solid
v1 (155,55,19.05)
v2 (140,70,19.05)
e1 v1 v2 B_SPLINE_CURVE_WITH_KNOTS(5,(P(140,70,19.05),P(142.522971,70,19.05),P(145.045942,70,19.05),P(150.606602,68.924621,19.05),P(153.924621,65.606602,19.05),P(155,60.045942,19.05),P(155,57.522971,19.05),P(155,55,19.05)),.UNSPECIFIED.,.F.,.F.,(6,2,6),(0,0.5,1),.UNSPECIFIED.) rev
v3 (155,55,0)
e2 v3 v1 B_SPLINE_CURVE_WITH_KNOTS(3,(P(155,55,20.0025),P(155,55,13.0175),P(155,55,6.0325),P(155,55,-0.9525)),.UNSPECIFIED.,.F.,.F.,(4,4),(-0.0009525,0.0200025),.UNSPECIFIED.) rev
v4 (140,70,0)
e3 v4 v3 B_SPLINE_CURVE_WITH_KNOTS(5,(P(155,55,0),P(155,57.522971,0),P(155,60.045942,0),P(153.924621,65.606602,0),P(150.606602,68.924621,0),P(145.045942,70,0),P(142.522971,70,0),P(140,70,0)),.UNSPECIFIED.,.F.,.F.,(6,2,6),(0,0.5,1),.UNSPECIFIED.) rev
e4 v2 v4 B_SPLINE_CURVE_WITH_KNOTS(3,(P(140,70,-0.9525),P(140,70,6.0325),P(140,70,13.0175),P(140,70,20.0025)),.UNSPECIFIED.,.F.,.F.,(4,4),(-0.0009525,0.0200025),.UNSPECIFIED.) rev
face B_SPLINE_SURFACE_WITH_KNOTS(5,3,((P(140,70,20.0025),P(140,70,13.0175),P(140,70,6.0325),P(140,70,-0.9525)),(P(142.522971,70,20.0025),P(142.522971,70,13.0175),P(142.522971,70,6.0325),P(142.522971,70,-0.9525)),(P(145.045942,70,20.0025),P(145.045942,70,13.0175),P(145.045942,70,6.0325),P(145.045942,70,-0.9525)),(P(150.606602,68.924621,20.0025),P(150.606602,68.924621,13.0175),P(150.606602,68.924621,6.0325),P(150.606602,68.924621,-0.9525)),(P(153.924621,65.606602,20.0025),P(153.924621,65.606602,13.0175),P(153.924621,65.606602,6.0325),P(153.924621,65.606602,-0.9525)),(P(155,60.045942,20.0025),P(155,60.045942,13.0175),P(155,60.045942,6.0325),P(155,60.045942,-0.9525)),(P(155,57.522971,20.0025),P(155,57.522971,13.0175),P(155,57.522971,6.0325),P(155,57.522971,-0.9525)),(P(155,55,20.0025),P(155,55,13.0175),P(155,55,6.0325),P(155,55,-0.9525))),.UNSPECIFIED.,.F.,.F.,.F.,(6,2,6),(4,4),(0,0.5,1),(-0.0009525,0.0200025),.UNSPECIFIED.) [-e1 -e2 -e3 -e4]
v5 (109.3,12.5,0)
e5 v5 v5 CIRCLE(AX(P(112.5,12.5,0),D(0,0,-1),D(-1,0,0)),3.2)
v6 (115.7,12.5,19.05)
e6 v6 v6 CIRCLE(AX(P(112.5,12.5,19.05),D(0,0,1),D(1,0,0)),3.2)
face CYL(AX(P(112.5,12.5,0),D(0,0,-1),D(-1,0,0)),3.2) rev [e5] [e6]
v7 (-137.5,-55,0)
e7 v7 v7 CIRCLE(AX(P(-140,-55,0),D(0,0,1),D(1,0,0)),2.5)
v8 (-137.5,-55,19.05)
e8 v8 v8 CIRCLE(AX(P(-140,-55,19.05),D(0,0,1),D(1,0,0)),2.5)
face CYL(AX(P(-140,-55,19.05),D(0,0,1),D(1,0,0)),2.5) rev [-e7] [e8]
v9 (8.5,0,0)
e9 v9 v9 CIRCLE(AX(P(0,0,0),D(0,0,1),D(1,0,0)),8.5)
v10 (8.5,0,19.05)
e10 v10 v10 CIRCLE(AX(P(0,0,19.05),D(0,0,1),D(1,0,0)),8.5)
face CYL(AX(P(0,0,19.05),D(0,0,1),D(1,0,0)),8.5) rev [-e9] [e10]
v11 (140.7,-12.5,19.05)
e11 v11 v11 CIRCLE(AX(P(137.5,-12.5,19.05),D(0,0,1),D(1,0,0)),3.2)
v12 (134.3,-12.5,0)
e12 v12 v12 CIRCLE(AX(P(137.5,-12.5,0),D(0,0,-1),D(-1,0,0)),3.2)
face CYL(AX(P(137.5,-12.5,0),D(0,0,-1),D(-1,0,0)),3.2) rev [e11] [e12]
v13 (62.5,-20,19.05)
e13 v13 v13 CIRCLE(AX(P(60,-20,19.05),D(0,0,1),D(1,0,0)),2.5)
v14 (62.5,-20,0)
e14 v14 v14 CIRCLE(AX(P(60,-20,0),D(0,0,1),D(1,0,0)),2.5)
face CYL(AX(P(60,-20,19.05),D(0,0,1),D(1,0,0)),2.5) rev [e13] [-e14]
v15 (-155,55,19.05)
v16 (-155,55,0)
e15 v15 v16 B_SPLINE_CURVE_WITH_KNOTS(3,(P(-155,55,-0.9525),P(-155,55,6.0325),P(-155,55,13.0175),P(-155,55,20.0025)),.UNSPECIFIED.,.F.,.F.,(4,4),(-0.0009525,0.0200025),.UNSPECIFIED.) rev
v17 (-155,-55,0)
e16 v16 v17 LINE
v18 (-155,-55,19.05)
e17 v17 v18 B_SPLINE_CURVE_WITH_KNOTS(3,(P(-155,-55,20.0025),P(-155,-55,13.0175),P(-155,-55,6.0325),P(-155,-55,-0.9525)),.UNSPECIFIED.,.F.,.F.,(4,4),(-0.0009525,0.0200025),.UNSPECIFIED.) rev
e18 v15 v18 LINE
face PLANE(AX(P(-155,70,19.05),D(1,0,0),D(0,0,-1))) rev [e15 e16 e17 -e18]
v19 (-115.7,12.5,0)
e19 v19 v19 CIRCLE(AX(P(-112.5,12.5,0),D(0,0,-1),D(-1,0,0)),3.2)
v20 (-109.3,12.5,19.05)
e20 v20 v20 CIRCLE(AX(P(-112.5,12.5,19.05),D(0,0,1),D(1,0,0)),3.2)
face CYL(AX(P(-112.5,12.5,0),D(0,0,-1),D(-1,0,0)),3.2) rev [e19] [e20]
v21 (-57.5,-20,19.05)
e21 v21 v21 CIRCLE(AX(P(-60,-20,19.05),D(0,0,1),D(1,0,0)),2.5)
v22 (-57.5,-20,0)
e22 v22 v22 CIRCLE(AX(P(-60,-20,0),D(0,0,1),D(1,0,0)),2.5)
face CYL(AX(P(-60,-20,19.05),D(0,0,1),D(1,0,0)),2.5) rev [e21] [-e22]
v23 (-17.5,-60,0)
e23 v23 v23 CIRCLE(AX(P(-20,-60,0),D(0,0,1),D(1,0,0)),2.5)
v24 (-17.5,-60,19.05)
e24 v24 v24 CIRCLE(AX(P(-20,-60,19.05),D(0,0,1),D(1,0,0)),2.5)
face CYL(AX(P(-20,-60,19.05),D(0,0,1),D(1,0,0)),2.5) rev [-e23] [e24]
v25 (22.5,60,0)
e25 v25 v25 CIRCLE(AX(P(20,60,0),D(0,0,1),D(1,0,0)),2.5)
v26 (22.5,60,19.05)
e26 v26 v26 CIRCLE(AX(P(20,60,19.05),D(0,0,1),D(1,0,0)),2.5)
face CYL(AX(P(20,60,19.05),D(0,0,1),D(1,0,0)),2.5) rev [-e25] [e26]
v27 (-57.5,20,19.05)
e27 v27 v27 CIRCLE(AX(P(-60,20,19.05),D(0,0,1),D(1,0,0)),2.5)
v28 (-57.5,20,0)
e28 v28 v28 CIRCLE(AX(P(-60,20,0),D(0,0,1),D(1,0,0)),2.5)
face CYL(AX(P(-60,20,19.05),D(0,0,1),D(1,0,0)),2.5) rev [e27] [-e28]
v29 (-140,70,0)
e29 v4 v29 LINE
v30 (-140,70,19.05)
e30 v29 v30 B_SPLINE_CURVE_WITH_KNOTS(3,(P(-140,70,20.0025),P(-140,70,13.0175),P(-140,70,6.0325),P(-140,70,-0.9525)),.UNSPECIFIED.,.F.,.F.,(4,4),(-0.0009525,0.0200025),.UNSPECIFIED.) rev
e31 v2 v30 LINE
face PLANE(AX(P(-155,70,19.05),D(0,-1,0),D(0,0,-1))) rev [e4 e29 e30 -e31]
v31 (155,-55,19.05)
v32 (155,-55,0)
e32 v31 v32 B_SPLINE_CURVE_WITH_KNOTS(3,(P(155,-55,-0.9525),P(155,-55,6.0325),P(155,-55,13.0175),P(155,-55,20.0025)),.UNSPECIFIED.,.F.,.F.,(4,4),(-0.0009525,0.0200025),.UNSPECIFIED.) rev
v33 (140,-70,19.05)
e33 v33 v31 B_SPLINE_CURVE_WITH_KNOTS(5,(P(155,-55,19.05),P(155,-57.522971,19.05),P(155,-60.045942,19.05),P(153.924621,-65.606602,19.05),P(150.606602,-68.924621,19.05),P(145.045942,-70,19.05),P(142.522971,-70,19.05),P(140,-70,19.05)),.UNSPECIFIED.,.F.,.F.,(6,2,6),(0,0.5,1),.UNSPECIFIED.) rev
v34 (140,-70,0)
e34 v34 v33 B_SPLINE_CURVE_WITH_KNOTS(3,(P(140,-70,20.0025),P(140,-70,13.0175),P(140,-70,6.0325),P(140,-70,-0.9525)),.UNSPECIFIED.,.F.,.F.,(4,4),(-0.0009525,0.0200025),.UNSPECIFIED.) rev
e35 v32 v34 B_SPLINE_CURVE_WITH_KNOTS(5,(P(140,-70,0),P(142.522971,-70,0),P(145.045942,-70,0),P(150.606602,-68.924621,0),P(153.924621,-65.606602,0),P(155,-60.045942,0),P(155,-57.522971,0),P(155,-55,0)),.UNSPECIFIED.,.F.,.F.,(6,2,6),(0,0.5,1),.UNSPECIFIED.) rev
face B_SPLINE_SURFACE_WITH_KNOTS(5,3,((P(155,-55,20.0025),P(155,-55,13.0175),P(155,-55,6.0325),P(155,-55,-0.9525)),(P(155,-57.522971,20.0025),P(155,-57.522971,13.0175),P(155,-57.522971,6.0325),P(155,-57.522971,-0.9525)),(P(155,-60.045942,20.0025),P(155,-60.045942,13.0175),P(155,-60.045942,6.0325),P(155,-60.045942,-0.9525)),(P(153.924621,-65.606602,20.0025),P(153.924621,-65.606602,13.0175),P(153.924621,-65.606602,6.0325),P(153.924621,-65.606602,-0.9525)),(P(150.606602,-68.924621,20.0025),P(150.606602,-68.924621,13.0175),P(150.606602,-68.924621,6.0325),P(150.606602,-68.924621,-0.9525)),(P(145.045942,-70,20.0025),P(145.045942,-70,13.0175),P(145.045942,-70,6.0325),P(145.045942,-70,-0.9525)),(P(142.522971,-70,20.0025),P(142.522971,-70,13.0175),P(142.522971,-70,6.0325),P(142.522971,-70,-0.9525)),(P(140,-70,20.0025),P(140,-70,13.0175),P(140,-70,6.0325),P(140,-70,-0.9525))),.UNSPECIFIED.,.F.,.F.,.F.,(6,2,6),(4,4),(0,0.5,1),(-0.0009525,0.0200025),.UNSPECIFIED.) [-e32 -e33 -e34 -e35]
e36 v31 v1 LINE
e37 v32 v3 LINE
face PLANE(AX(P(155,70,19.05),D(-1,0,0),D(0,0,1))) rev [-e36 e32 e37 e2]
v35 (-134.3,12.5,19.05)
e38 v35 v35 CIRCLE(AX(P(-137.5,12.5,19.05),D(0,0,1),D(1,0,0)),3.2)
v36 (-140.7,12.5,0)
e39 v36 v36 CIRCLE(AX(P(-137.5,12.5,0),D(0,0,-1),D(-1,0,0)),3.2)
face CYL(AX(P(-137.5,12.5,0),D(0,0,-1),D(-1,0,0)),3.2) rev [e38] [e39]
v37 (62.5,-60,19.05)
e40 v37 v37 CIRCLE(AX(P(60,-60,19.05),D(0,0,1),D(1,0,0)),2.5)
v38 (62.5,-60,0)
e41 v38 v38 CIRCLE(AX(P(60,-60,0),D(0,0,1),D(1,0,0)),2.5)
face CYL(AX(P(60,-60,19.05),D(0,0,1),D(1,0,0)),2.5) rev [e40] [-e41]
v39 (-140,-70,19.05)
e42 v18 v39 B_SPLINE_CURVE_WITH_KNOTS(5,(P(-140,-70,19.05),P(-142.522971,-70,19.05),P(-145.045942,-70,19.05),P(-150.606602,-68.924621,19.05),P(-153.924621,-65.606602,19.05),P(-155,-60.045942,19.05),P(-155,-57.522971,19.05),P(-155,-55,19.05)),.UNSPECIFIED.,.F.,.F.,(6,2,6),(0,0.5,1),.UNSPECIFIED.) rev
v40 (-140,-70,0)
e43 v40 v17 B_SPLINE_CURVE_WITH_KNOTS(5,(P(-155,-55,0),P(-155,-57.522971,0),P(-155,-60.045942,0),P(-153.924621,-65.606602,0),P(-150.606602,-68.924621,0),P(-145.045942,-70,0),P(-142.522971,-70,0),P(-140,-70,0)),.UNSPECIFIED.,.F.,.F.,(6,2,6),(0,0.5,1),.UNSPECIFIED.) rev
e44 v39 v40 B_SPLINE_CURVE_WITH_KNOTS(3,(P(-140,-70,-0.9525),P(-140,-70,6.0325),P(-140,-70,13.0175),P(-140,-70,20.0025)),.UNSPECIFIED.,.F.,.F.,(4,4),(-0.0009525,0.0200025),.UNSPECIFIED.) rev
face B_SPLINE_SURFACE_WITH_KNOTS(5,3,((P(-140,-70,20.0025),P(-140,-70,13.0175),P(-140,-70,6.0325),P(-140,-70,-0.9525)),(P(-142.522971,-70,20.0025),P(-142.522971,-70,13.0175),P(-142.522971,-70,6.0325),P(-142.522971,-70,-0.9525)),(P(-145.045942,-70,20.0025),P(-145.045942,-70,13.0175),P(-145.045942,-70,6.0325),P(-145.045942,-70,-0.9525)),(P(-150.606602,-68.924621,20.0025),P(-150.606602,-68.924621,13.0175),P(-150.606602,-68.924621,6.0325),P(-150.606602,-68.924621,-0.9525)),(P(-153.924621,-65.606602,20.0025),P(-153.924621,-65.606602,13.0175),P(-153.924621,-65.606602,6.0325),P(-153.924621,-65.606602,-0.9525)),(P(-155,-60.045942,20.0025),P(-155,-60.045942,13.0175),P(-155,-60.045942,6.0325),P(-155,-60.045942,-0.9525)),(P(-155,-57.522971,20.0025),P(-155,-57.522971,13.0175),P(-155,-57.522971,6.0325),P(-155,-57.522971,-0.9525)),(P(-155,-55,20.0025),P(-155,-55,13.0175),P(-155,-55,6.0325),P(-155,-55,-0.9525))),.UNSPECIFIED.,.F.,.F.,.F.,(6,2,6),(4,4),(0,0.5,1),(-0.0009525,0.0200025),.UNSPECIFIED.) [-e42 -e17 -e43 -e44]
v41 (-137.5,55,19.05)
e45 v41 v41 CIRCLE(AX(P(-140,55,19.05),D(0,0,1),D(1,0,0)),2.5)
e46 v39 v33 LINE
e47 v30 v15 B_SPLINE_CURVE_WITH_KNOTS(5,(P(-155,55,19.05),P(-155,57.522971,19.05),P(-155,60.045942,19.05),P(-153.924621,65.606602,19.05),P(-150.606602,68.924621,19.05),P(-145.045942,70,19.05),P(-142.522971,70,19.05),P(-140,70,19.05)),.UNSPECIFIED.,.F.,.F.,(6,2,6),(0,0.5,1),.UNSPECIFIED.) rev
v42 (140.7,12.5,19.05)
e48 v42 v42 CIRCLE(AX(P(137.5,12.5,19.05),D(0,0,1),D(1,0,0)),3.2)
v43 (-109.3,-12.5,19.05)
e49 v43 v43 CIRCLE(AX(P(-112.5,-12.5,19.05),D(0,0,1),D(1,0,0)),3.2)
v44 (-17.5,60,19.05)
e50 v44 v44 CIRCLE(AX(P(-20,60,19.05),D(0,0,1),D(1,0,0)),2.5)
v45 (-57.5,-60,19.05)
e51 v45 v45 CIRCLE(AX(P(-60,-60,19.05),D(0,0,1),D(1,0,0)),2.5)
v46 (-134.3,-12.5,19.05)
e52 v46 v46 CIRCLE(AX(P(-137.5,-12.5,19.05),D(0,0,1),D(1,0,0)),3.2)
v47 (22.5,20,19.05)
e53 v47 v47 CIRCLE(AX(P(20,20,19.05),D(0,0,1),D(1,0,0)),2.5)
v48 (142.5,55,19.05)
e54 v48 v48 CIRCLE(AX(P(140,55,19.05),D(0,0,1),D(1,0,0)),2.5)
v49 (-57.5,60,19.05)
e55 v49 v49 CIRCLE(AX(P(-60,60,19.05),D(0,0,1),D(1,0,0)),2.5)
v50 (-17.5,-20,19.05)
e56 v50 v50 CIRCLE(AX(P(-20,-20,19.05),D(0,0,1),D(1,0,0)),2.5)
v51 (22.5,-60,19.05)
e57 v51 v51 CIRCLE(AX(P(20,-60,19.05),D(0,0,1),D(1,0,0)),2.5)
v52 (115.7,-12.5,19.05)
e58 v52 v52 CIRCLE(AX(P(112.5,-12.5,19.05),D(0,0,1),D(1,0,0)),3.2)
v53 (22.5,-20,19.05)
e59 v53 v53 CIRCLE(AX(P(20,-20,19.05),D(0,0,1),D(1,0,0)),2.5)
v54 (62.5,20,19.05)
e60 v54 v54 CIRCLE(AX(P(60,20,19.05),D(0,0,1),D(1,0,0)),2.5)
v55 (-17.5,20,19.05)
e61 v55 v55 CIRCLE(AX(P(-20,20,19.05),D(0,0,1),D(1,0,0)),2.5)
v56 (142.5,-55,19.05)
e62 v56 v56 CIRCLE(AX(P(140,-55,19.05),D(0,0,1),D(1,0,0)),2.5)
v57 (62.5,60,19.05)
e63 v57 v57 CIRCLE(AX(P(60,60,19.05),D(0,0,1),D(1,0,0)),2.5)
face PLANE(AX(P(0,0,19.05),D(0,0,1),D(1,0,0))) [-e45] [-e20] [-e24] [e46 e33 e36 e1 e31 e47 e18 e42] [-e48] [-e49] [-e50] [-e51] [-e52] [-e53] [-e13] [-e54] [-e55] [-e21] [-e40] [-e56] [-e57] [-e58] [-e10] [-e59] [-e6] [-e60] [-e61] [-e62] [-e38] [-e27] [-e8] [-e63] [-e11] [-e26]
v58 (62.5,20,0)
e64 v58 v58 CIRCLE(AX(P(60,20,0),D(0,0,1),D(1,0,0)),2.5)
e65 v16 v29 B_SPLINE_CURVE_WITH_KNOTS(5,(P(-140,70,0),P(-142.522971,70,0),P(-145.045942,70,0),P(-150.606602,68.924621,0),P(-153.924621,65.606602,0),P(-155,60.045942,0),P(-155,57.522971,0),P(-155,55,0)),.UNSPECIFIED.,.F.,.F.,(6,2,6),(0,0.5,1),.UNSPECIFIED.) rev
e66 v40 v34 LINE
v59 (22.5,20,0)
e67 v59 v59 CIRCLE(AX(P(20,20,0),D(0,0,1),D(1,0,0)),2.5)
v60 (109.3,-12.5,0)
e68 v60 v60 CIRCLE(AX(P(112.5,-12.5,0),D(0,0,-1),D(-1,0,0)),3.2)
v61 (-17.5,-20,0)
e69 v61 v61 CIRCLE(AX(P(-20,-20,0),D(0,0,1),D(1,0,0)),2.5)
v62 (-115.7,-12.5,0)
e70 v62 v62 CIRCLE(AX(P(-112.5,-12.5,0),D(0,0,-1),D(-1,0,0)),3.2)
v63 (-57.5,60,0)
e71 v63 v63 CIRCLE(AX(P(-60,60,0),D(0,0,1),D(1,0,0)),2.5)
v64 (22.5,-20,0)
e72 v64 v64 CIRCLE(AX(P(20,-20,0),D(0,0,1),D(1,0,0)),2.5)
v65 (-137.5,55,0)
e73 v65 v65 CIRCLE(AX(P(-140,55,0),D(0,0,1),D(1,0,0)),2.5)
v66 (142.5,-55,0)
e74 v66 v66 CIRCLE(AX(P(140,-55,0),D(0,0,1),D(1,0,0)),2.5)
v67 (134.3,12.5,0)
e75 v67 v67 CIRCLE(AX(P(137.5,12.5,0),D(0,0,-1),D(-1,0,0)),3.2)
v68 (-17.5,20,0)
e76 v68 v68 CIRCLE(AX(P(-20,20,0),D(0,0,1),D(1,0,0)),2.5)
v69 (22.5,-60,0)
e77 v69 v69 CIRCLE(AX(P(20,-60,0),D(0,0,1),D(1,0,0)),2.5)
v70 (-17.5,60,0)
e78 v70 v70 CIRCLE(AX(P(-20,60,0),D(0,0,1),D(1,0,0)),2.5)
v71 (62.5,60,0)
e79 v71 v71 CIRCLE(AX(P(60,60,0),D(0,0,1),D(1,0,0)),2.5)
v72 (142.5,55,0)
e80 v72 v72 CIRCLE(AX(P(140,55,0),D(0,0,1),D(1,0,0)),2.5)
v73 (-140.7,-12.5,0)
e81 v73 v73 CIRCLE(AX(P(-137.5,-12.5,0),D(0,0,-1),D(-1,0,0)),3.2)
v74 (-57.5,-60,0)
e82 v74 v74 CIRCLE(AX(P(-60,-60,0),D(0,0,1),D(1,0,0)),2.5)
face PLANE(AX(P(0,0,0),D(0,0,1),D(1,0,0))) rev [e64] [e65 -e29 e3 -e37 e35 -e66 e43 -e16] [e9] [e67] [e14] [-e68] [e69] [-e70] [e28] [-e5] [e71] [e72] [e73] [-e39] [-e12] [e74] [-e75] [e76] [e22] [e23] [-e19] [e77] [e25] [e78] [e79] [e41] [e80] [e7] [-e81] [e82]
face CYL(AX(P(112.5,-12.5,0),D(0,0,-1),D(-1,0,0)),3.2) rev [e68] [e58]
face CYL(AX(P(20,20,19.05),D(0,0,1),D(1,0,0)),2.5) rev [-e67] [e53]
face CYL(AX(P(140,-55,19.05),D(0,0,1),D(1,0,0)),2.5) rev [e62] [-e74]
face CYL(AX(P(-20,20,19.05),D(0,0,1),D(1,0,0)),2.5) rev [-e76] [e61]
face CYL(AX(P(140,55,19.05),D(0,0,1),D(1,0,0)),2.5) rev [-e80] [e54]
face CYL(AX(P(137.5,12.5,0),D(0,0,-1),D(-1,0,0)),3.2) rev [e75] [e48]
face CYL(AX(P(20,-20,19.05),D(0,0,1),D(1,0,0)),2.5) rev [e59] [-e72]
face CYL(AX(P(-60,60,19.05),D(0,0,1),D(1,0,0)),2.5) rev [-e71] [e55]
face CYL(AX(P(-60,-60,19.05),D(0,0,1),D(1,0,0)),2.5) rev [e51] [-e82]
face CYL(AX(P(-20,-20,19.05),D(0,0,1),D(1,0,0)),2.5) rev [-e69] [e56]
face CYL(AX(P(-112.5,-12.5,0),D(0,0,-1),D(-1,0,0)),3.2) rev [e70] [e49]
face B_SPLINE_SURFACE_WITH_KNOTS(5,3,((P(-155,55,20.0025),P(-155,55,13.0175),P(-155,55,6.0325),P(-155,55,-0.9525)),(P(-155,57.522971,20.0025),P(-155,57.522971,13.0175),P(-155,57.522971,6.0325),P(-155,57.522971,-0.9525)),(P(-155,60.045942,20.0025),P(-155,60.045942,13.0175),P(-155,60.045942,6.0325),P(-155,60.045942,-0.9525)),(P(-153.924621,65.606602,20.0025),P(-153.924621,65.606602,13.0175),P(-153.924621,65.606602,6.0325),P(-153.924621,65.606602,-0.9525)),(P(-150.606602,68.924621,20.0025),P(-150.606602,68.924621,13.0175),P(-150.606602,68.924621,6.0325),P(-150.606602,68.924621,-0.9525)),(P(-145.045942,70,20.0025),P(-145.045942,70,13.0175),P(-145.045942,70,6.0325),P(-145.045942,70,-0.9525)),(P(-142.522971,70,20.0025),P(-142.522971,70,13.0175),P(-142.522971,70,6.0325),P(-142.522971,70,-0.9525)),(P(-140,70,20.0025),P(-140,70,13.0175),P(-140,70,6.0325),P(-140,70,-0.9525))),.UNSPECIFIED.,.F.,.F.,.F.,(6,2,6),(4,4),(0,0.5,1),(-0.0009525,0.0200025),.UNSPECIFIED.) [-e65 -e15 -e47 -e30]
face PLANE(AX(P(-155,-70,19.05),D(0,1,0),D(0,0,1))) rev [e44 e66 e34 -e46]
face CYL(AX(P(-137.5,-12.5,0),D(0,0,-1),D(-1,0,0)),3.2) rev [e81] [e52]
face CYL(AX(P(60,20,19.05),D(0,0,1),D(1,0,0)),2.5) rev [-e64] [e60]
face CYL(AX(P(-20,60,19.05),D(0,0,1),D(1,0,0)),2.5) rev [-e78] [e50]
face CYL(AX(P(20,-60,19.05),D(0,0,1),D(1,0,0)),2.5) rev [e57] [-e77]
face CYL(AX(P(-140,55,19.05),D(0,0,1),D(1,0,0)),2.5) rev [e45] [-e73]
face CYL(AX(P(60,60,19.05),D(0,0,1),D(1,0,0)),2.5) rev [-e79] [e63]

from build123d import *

# Parameters (mm, degrees)
SKETCH1_W                           = 310
SKETCH1_H                           = 140
BOSS_EXTRUDE1_DEPTH                 = 19.05
TAP_DRILL_FOR_M6X1_0_TAP1_D         = 5
LPATTERN1_COUNT                     = 4
LPATTERN1_PITCH                     = 40
LPATTERN1_COUNT_DIR2                = 4
LPATTERN1_PITCH_DIR2                = 40
FILLET1_SIZE                        = 15
M6_CLEARANCE_HOLE1_D                = 6.4
M16_CLEARANCE_HOLE1_D               = 17
TAP_START                           = -1
TAP_DRILL_FOR_M6X1_0_TAP2_OUTLINE_R = 2.5
TAP_DRILL_FOR_M6X1_0_TAP2_DEPTH     = 21


with BuildPart() as part:
    # Sketch1 → Boss-Extrude1 (new body)
    with BuildSketch(Plane.XY):
        Rectangle(SKETCH1_W, SKETCH1_H)
    extrude(amount=BOSS_EXTRUDE1_DEPTH)

    # Tap Drill for M6x1.0 Tap1 (through all)
    with Locations(Plane.XY.offset(19.05)):
        with Locations((-60, 60)):
            tap_drill_for_m6x1_0_tap1 = Hole(TAP_DRILL_FOR_M6X1_0_TAP1_D / 2)

    # LPattern1: Tap Drill for M6x1.0 Tap1 4 × 4
    with Locations(*[(i * LPATTERN1_PITCH, -j * LPATTERN1_PITCH_DIR2, 0) for i in range(LPATTERN1_COUNT) for j in range(LPATTERN1_COUNT_DIR2) if (i, j) != (0, 0)]):
        add(tap_drill_for_m6x1_0_tap1, mode=Mode.SUBTRACT)

    # Fillet1
    # a fillet whose section is not a circle: 15 mm, written as the material it takes off along each edge
    with BuildSketch(Plane(origin=(155, -70, -37.5), x_dir=(0, 1, 0), z_dir=(0, 0, 1)), Plane(origin=(155, 70, -37.5), x_dir=(-1, 0, 0), z_dir=(0, 0, 1))) as fillet1_piece_1:
        with BuildLine():
            add(Edge.make_bspline([(FILLET1_SIZE, 0), (FILLET1_SIZE * 0.831801948466, 0), (FILLET1_SIZE * 0.663603896932, 0), (FILLET1_SIZE * 0.292893218813, FILLET1_SIZE * 0.0716919198361), (FILLET1_SIZE * 0.0716919198361, FILLET1_SIZE * 0.292893218813), (0, FILLET1_SIZE * 0.663603896932), (0, FILLET1_SIZE * 0.831801948466), (0, FILLET1_SIZE)], knots=[0, 0, 0, 0, 0, 0, 0.5, 0.5, 1, 1, 1, 1, 1, 1], degree=5))
            Line((0, FILLET1_SIZE), (0, 0))
            Line((0, 0), (FILLET1_SIZE, 0))
        make_face()
    extrude(amount=94.05, mode=Mode.SUBTRACT)
    with BuildSketch(Plane(origin=(-155, 70, -37.5), x_dir=(1, 0, 0), z_dir=(0, 0, 1)), Plane(origin=(-155, -70, -37.5), x_dir=(0, 1, 0), z_dir=(0, 0, 1))) as fillet1_piece_2:
        with BuildLine():
            add(Edge.make_bspline([(FILLET1_SIZE, 0), (FILLET1_SIZE * 0.831801948466, 0), (FILLET1_SIZE * 0.663603896932, 0), (FILLET1_SIZE * 0.292893218813, -FILLET1_SIZE * 0.0716919198361), (FILLET1_SIZE * 0.0716919198361, -FILLET1_SIZE * 0.292893218813), (0, -FILLET1_SIZE * 0.663603896932), (0, -FILLET1_SIZE * 0.831801948466), (0, -FILLET1_SIZE)], knots=[0, 0, 0, 0, 0, 0, 0.5, 0.5, 1, 1, 1, 1, 1, 1], degree=5))
            Line((0, -FILLET1_SIZE), (0, 0))
            Line((0, 0), (FILLET1_SIZE, 0))
        make_face()
    extrude(amount=94.05, mode=Mode.SUBTRACT)

    # M6 Clearance Hole1 (through all)
    with Locations(Plane(origin=(0, 0, 0), x_dir=(-1, 0, 0), z_dir=(0, 0, -1))):
        with Locations((137.5, -12.5), (137.5, 12.5), (112.5, 12.5), (112.5, -12.5), (-112.5, -12.5), (-137.5, -12.5), (-112.5, 12.5), (-137.5, 12.5)):
            Hole(M6_CLEARANCE_HOLE1_D / 2)

    # M16 Clearance Hole1 (through all)
    with Locations(Plane.XY.offset(19.05)):
        with Locations((0, 0)):
            Hole(M16_CLEARANCE_HOLE1_D / 2)

    # Tap Drill for M6x1.0 Tap2: read off the stored shape, not the designer's step
    # Tap Drill for M6x1.0 Tap2 outline → Tap Drill for M6x1.0 Tap2 (cut)
    with BuildSketch(Plane.XY.offset(TAP_START)):
        with Locations((140, 55)):
            Circle(TAP_DRILL_FOR_M6X1_0_TAP2_OUTLINE_R)
        with Locations((-140, -55)):
            Circle(TAP_DRILL_FOR_M6X1_0_TAP2_OUTLINE_R)
        with Locations((140, -55)):
            Circle(TAP_DRILL_FOR_M6X1_0_TAP2_OUTLINE_R)
        with Locations((-140, 55)):
            Circle(TAP_DRILL_FOR_M6X1_0_TAP2_OUTLINE_R)
    extrude(amount=TAP_DRILL_FOR_M6X1_0_TAP2_DEPTH, mode=Mode.SUBTRACT)


solid = part.part
